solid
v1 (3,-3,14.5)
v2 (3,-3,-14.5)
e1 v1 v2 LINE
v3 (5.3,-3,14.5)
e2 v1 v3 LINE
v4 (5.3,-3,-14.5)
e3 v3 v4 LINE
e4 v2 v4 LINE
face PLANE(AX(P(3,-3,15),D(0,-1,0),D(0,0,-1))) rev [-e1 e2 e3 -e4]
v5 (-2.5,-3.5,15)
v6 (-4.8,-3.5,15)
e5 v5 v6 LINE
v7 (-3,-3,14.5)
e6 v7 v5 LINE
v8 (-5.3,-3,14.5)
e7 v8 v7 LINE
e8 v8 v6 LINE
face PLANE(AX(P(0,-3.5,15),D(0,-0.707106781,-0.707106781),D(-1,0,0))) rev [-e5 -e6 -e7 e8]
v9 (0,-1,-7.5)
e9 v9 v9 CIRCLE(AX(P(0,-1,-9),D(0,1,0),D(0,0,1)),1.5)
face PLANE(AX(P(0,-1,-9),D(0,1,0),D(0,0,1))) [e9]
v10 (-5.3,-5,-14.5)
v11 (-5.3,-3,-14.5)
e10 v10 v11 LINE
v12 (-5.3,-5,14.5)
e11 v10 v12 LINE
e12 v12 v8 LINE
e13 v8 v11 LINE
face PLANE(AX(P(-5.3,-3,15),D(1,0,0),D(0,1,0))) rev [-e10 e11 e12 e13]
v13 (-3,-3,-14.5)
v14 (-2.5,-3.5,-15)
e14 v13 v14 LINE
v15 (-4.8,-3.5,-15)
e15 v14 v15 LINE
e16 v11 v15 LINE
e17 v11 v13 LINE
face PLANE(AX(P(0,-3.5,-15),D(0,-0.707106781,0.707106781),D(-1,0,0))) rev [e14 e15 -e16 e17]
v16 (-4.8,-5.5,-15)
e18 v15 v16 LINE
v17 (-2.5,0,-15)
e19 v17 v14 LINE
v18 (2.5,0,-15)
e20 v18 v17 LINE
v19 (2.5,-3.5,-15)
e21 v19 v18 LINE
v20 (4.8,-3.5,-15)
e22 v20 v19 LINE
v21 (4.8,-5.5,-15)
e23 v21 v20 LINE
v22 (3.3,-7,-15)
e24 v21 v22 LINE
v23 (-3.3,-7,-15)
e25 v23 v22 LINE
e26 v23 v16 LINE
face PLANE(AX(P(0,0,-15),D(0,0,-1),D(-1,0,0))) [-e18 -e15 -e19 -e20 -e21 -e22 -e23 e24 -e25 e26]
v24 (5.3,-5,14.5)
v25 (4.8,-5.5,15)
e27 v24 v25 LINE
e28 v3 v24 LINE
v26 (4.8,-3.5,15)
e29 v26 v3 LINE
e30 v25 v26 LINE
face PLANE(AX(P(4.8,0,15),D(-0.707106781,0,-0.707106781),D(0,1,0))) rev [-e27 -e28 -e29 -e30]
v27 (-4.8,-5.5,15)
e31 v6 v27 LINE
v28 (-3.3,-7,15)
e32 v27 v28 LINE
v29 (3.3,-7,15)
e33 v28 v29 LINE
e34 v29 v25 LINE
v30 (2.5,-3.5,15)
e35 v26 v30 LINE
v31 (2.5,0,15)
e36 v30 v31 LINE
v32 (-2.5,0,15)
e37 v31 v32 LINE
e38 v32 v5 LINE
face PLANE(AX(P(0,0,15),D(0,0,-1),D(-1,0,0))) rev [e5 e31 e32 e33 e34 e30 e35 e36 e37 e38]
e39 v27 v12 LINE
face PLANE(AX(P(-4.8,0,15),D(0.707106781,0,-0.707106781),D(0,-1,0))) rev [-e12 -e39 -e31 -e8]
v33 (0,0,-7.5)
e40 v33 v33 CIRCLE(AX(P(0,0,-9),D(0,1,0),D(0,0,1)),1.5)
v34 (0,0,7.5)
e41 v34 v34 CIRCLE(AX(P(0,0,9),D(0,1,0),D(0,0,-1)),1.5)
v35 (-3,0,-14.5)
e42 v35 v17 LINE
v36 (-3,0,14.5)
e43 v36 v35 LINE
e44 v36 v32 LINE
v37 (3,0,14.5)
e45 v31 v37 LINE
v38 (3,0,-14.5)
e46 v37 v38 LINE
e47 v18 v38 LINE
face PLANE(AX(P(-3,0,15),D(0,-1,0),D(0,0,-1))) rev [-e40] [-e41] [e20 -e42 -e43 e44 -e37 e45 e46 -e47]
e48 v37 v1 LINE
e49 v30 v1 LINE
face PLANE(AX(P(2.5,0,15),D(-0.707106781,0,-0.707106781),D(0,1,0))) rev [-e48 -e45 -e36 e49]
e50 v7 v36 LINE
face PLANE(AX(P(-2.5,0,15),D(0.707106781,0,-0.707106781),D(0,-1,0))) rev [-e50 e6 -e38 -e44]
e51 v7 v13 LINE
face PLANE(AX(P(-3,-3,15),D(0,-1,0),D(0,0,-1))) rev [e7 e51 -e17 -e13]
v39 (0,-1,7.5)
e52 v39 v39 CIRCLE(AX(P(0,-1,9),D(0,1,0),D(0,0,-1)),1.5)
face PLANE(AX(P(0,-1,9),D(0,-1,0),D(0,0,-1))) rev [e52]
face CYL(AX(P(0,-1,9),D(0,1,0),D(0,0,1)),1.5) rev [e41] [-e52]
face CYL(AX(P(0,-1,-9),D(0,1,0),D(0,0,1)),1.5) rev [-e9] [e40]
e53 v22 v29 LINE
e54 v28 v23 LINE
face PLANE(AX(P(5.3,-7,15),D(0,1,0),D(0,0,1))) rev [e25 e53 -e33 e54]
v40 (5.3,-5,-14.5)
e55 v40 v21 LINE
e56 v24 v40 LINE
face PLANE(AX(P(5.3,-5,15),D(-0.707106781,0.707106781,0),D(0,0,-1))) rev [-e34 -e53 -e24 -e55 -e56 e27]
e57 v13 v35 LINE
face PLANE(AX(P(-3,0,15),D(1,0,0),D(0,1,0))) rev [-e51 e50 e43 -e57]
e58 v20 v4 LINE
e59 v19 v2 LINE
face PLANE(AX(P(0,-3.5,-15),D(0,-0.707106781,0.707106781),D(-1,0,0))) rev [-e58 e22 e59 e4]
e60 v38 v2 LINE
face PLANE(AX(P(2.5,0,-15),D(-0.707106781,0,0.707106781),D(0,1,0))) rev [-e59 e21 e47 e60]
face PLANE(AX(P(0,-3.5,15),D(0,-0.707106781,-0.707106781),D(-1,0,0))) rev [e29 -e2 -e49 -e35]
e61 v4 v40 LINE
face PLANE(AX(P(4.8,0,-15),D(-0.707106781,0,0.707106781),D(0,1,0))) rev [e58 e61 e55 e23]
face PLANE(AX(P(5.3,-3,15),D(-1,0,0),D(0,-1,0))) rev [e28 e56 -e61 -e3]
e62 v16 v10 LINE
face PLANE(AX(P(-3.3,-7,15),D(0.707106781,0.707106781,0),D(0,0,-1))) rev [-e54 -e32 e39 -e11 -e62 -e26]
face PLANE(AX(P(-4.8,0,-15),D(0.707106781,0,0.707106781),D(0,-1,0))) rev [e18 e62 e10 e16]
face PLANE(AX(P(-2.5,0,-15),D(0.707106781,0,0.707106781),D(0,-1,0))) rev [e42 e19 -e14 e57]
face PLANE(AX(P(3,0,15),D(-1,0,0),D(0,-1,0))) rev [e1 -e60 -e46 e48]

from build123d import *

# Parameters (mm, degrees)
EXTRUDE_1_DEPTH     = 15
CHAMFER_1_SIZE      = 2
CHAMFER_2_SIZE      = 0.5
MIRROR_START        = -9.237604307
MIRROR_2_DEPTH      = 2.598076211
MIRROR_START_2      = 6.639528096
MIRROR_2_2_DEPTH    = 2.598076211
SKETCH_2_R          = 1.5
CUT_EXTRUDE_1_DEPTH = 1


# Read off the part's stored shape, not the designer's step: 镜向2
with BuildPart() as part:
    # 草图1 → 凸台-拉伸1 (new, symmetric)
    with BuildSketch(Plane.XY):
        Polygon((-3, 0), (3, 0), (3, -3), (5.3, -3), (5.3, -7), (-5.3, -7), (-5.3, -3), (-3, -3), align=None)
    extrude(amount=EXTRUDE_1_DEPTH, both=True)

    # 倒角1
    chamfer_1_edges = [part.edges().sort_by_distance(p)[0] for p in [
        (5.3, -7, 0),
        (-5.3, -7, 0),
    ]]
    chamfer(chamfer_1_edges, length=CHAMFER_1_SIZE)

    # 倒角2
    chamfer_2_edges = [part.edges().sort_by_distance(p)[0] for p in [
        (-3, -1.5, 15),
        (-4.15, -3, 15),
        (-5.3, -4, 15),
        (5.3, -4, 15),
        (4.15, -3, 15),
        (3, -1.5, 15),
    ]]
    chamfer(chamfer_2_edges, length=CHAMFER_2_SIZE)

    # 镜向2 outline → 镜向2 (cut)
    with BuildSketch(Plane(origin=(0, 0, 0), x_dir=(0.816496580927727, -0.4082482904638606, -0.4082482904638635), z_dir=(0.5773502691896244, 0.5773502691896244, 0.5773502691896285)).offset(MIRROR_START)):
        Polygon((9.593834826, 8.131727984), (11.471776962, 8.131727984), (12.288273543, 6.717514421), (13.279880956, 5), (14, 5), (14, 12), (7.360486936, 12), (8.164965809, 10.606601718), align=None)
    extrude(amount=MIRROR_2_DEPTH, mode=Mode.SUBTRACT)

    # Mirror 2 2 outline → Mirror 2 2 (cut)
    with BuildSketch(Plane(origin=(0, 0, 0), x_dir=(0.816496580927727, 0.4082482904638606, 0.4082482904638635), z_dir=(0.5773502691896244, -0.5773502691896244, -0.5773502691896285)).offset(MIRROR_START_2)):
        Polygon((-8.164965809, -10.606601718), (-9.593834826, -8.131727984), (-11.471776962, -8.131727984), (-12.288273543, -6.717514421), (-13.279880956, -5), (-14, -5), (-14, -12), (-7.360486936, -12), align=None)
    extrude(amount=MIRROR_2_2_DEPTH, mode=Mode.SUBTRACT)

    # 草图2 → 切除-拉伸1 (cut)
    with BuildSketch(Plane(origin=(0, 0, 0), x_dir=(1, 0, 0), z_dir=(0, 1, 0))):
        with Locations(Location((0, 9, 0), (0, 0, 270))):
            Circle(SKETCH_2_R)
        with Locations(Location((0, -9, 0), (0, 0, 90))):
            Circle(SKETCH_2_R)
    extrude(amount=-CUT_EXTRUDE_1_DEPTH, mode=Mode.SUBTRACT)


solid = part.part
